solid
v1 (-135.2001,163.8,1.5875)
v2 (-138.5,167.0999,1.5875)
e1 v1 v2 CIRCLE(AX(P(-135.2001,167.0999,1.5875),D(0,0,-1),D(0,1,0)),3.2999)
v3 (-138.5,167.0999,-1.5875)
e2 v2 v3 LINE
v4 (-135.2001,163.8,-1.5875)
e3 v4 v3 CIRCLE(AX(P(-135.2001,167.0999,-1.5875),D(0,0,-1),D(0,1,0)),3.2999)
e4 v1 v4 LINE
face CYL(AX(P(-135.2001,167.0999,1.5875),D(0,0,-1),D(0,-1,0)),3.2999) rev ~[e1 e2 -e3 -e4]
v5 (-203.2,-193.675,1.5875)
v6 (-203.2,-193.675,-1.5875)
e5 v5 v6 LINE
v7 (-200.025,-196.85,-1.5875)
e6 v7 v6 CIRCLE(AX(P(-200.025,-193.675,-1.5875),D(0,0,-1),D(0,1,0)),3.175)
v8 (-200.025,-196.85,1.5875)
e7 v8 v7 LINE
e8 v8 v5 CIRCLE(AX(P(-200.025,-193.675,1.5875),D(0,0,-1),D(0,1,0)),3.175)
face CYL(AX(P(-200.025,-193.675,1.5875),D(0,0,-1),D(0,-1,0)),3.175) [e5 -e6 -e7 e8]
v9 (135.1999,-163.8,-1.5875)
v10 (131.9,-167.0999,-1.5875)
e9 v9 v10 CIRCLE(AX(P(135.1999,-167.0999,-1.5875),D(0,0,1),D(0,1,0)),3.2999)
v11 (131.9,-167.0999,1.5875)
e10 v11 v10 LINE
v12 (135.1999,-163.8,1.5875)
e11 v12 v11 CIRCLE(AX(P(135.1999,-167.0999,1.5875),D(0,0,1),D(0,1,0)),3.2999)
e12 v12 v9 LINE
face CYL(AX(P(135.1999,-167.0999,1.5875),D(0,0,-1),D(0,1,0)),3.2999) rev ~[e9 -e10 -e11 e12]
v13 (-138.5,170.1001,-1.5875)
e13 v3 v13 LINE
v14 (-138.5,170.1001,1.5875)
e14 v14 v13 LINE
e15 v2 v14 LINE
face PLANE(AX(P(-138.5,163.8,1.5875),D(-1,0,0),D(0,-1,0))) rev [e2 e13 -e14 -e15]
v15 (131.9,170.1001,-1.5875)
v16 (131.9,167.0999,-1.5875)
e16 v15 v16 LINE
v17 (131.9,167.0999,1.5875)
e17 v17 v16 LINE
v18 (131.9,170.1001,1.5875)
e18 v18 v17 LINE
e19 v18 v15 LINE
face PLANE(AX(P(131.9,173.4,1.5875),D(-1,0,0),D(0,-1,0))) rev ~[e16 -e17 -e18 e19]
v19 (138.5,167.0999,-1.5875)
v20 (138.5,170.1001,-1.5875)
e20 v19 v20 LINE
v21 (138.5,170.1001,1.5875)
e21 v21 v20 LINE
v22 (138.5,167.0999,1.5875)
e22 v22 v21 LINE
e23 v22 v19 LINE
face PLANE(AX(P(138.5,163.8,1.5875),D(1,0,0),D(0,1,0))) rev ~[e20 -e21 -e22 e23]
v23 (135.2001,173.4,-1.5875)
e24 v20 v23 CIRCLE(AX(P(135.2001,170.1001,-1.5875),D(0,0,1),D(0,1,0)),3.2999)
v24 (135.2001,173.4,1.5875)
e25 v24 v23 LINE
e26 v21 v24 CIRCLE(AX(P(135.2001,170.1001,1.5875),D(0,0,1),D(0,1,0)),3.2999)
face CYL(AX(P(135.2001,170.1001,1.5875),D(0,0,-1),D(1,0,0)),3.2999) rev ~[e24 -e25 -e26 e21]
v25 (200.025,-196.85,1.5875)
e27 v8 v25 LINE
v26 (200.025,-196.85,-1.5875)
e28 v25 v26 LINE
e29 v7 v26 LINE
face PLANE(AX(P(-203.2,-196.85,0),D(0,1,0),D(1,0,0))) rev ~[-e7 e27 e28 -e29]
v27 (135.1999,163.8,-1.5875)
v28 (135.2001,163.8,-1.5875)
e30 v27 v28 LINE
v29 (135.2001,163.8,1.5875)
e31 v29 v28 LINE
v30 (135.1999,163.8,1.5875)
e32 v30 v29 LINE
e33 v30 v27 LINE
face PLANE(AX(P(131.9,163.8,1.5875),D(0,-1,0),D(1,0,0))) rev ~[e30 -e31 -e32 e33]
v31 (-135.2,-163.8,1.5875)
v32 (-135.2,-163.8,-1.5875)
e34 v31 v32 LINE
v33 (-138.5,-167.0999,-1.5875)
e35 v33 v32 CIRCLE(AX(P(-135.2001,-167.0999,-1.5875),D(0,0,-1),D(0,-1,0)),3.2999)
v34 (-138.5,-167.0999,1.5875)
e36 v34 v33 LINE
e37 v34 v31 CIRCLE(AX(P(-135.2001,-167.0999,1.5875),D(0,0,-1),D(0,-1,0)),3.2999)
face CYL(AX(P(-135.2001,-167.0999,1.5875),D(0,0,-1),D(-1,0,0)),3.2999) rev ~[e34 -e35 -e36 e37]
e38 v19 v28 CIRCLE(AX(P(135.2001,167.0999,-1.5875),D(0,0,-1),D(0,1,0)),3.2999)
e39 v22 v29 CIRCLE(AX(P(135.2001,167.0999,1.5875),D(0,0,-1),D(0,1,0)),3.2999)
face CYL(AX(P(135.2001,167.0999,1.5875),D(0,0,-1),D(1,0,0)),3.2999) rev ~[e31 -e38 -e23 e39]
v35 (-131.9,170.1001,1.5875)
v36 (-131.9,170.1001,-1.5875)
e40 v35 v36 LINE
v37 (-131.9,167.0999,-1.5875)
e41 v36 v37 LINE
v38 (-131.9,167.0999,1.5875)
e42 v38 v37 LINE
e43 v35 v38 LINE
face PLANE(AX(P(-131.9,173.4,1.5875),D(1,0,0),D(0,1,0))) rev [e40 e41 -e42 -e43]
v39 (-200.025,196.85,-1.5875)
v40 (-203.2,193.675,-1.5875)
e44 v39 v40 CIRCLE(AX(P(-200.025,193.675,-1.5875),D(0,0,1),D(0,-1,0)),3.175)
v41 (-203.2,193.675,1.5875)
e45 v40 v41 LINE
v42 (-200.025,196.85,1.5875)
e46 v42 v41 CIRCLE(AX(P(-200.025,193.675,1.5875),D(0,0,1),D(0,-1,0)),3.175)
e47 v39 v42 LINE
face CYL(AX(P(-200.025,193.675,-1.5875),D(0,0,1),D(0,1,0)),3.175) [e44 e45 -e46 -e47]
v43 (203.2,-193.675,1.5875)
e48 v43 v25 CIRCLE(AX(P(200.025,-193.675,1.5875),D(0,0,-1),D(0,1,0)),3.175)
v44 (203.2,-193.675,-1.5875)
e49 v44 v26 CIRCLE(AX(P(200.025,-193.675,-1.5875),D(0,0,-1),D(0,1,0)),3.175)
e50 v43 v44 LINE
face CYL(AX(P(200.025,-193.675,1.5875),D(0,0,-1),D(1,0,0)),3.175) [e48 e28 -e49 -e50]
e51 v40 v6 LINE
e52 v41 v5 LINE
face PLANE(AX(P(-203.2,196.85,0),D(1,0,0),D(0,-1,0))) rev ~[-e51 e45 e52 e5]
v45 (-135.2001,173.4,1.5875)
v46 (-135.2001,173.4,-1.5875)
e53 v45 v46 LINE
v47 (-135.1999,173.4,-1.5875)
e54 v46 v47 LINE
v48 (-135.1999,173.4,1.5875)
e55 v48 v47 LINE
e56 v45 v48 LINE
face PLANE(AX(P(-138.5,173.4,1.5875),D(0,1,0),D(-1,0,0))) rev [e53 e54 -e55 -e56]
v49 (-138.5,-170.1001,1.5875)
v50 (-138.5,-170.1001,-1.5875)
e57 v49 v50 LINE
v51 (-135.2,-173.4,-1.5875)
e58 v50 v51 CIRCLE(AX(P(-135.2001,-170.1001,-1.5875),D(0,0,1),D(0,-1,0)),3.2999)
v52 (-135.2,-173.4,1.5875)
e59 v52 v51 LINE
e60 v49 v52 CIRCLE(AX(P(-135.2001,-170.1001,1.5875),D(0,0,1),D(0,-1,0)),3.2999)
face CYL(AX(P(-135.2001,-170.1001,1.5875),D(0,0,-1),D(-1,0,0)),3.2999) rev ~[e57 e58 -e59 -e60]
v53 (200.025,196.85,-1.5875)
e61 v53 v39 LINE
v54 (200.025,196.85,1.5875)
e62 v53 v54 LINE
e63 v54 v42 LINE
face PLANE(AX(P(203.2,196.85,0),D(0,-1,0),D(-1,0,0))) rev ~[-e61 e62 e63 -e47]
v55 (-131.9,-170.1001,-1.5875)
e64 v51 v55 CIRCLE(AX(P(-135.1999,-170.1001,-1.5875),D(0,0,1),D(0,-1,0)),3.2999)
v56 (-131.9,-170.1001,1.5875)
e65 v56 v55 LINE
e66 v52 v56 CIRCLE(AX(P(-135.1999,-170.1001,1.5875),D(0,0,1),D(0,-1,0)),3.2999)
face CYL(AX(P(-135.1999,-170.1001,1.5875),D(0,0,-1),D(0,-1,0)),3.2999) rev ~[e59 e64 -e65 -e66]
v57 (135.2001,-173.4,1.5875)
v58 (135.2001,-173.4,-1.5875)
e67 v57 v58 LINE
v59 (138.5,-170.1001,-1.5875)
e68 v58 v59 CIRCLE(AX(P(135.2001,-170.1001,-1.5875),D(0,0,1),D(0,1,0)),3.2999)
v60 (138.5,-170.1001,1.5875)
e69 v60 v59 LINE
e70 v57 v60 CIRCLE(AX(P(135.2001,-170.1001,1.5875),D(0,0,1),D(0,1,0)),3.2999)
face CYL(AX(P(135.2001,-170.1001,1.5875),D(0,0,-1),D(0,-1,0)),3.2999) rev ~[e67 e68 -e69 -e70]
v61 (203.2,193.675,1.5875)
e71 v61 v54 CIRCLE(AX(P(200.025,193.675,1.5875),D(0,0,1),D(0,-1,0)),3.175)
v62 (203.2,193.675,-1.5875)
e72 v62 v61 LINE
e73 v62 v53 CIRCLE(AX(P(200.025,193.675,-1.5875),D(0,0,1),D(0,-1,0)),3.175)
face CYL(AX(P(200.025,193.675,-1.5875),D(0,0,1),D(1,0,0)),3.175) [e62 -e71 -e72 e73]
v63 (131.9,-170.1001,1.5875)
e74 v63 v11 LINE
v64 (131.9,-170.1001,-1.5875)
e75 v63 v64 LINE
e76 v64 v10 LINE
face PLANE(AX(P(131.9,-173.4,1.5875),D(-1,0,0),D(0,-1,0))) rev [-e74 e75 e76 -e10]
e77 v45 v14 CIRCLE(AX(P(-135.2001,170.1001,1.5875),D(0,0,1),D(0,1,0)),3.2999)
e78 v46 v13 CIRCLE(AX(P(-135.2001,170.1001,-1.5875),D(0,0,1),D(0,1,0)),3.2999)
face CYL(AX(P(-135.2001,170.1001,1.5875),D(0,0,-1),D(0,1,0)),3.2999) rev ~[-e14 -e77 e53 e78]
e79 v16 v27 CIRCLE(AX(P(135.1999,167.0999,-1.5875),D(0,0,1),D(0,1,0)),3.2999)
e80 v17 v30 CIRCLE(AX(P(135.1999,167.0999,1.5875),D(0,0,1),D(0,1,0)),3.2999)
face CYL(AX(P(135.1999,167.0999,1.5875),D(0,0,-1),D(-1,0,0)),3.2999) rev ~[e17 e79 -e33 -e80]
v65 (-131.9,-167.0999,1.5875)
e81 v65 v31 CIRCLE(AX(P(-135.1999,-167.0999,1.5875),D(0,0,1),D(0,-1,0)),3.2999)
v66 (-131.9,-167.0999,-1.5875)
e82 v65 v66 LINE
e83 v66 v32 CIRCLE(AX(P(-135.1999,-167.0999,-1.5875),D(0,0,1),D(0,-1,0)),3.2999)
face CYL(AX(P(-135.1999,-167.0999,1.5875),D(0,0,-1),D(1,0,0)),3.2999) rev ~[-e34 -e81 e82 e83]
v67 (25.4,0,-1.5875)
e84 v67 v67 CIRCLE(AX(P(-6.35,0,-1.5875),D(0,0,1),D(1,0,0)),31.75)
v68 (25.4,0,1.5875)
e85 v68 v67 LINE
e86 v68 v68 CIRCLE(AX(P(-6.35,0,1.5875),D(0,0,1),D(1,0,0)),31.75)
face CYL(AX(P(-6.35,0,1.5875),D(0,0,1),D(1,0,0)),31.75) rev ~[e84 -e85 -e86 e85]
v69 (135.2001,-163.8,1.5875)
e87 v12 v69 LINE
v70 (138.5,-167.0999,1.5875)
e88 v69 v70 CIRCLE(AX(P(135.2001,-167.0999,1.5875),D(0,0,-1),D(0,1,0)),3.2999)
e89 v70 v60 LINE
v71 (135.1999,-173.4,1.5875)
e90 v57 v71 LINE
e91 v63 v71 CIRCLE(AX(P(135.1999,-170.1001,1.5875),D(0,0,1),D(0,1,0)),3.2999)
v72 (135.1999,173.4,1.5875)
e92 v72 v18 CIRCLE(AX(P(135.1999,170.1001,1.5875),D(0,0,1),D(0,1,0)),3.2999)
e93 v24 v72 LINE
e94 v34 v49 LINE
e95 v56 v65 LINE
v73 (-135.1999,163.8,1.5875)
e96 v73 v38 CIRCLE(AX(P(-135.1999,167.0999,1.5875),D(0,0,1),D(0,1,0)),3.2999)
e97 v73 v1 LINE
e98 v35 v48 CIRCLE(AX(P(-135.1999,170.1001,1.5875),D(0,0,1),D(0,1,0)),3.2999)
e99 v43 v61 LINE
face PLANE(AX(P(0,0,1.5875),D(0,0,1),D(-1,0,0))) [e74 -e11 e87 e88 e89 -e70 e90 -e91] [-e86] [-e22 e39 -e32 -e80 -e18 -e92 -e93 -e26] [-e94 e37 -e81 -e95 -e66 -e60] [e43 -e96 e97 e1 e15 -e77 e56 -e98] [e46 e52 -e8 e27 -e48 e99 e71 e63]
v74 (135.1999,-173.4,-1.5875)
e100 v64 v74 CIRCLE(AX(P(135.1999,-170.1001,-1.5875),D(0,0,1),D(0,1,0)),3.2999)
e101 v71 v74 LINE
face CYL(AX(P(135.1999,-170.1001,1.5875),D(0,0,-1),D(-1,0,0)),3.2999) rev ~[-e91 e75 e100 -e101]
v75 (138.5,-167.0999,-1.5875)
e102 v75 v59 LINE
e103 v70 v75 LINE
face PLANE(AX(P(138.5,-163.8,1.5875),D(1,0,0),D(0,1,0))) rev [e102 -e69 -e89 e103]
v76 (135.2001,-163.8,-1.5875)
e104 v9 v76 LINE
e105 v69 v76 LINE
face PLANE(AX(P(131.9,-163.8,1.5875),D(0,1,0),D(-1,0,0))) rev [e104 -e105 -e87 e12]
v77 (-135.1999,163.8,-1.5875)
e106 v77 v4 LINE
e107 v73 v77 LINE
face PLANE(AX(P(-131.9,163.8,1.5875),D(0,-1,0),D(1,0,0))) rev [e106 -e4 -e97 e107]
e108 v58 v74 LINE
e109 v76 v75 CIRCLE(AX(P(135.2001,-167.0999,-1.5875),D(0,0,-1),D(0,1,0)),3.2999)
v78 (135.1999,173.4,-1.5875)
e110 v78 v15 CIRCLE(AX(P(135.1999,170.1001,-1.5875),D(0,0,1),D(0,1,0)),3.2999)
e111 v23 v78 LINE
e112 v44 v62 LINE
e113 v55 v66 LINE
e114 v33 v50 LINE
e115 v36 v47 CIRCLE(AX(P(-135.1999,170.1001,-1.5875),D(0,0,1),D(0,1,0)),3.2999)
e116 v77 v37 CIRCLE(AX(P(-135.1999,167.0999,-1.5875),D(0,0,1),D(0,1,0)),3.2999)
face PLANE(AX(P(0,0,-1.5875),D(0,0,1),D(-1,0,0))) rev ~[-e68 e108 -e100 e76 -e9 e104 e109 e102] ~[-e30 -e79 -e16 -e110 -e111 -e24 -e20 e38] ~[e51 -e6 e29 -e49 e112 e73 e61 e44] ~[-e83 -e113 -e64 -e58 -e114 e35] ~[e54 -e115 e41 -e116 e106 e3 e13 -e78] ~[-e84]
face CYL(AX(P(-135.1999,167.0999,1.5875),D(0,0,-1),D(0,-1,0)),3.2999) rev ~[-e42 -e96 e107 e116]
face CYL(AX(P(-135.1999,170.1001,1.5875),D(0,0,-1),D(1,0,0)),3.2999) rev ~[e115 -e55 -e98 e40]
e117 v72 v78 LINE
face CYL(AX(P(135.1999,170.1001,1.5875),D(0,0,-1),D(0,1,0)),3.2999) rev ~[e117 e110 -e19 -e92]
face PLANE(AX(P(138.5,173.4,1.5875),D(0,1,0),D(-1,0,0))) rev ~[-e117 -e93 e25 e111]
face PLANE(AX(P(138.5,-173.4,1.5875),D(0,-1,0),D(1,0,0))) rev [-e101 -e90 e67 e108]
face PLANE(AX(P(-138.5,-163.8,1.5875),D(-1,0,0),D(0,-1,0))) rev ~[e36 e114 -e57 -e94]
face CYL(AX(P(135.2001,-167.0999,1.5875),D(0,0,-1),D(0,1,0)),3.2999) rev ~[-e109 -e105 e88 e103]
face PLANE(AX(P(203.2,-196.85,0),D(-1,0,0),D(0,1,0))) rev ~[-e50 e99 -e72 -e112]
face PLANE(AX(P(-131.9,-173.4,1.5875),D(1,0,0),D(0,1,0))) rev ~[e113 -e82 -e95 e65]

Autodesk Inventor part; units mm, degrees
ref_plane "YZ Plane" through (0, 0, 0) normal (1, 0, 0) x (0, 1, 0)
ref_plane "XZ Plane" through (0, 0, 0) normal (0, 1, 0) x (-1, 0, 0)
ref_plane "XY Plane" through (0, 0, 0) normal (0, 0, 1) x (1, 0, 0)
sketch "Sketch1" plane through (0, 0, 0) normal (0, 0, 1) x (1, 0, 0)
  line L0 (203.2, 196.85) -> (-203.2, 196.85)
  line L1 (-203.2, 196.85) -> (-203.2, -196.85)
  line L2 (-203.2, -196.85) -> (203.2, -196.85)
  line L3 (203.2, -196.85) -> (203.2, 196.85)
  point P0 (0, 0)
  dimension "d0" = 393.7
  dimension "d1" = 406.4
  dimension "d2" = 203.2
  dimension "d3" = 196.85
extrude "Extrusion1" add sketch "Sketch1" along normal mid plane 3.175
sketch "Sketch2" plane through (0, 0, 1.5875) normal (0, 0, 1) x (1, 0, 0)
  circle A0 centre (-6.35, 0) radius 31.75
  point P0 (0, 0)
  dimension "d6" = 63.5
  dimension "d20" = 6.35
extrude "Extrusion2" cut sketch "Sketch2" against normal through all
fillet "Fillet1" radius 3.175 4 edges at (203.2, -196.85, 0) (-203.2, -196.85, 0) (-203.2, 196.85, 0) (203.2, 196.85, 0)
sketch "Sketch3" plane through (0, 0, 1.5875) normal (0, 0, 1) x (1, 0, 0)
  line L0 (138.5, 173.4) -> (131.9, 173.4)
  line L1 (131.9, 173.4) -> (131.9, 163.8)
  line L2 (131.9, 163.8) -> (138.5, 163.8)
  line L3 (138.5, 163.8) -> (138.5, 173.4)
  line L4 (135.2, 173.4) -> (135.2, 163.8) construction
  line L5 (203.2, -193.675) -> (203.2, 193.675) projected
  line L6 (200.025, 196.85) -> (-200.025, 196.85) projected
  line L7 (138.5, 168.6) -> (131.9, 168.6) construction
  point P0 (0, 0)
  dimension "d11" = 6.6
  dimension "d12" = 68
  dimension "d14" = 9.6
  dimension "d18" = 28.25
extrude "Extrusion3" cut sketch "Sketch3" against normal through all
fillet "Fillet2" radius 3.3 4 edges at (138.5, 173.4, 0) (131.9, 173.4, 0) (138.5, 163.8, 0) (131.9, 163.8, 0)
mirror "Mirror1" about plane through (0, 0, 0) normal (0, 1, 0) of "Extrusion3", "Fillet2"
mirror "Mirror2" about plane through (0, 0, 0) normal (1, 0, 0) of "Extrusion3", "Fillet2", "Mirror1"
equation "\"d2\" = 0.5 * d1"
equation "\"d3\" = 0.5 * d0"
